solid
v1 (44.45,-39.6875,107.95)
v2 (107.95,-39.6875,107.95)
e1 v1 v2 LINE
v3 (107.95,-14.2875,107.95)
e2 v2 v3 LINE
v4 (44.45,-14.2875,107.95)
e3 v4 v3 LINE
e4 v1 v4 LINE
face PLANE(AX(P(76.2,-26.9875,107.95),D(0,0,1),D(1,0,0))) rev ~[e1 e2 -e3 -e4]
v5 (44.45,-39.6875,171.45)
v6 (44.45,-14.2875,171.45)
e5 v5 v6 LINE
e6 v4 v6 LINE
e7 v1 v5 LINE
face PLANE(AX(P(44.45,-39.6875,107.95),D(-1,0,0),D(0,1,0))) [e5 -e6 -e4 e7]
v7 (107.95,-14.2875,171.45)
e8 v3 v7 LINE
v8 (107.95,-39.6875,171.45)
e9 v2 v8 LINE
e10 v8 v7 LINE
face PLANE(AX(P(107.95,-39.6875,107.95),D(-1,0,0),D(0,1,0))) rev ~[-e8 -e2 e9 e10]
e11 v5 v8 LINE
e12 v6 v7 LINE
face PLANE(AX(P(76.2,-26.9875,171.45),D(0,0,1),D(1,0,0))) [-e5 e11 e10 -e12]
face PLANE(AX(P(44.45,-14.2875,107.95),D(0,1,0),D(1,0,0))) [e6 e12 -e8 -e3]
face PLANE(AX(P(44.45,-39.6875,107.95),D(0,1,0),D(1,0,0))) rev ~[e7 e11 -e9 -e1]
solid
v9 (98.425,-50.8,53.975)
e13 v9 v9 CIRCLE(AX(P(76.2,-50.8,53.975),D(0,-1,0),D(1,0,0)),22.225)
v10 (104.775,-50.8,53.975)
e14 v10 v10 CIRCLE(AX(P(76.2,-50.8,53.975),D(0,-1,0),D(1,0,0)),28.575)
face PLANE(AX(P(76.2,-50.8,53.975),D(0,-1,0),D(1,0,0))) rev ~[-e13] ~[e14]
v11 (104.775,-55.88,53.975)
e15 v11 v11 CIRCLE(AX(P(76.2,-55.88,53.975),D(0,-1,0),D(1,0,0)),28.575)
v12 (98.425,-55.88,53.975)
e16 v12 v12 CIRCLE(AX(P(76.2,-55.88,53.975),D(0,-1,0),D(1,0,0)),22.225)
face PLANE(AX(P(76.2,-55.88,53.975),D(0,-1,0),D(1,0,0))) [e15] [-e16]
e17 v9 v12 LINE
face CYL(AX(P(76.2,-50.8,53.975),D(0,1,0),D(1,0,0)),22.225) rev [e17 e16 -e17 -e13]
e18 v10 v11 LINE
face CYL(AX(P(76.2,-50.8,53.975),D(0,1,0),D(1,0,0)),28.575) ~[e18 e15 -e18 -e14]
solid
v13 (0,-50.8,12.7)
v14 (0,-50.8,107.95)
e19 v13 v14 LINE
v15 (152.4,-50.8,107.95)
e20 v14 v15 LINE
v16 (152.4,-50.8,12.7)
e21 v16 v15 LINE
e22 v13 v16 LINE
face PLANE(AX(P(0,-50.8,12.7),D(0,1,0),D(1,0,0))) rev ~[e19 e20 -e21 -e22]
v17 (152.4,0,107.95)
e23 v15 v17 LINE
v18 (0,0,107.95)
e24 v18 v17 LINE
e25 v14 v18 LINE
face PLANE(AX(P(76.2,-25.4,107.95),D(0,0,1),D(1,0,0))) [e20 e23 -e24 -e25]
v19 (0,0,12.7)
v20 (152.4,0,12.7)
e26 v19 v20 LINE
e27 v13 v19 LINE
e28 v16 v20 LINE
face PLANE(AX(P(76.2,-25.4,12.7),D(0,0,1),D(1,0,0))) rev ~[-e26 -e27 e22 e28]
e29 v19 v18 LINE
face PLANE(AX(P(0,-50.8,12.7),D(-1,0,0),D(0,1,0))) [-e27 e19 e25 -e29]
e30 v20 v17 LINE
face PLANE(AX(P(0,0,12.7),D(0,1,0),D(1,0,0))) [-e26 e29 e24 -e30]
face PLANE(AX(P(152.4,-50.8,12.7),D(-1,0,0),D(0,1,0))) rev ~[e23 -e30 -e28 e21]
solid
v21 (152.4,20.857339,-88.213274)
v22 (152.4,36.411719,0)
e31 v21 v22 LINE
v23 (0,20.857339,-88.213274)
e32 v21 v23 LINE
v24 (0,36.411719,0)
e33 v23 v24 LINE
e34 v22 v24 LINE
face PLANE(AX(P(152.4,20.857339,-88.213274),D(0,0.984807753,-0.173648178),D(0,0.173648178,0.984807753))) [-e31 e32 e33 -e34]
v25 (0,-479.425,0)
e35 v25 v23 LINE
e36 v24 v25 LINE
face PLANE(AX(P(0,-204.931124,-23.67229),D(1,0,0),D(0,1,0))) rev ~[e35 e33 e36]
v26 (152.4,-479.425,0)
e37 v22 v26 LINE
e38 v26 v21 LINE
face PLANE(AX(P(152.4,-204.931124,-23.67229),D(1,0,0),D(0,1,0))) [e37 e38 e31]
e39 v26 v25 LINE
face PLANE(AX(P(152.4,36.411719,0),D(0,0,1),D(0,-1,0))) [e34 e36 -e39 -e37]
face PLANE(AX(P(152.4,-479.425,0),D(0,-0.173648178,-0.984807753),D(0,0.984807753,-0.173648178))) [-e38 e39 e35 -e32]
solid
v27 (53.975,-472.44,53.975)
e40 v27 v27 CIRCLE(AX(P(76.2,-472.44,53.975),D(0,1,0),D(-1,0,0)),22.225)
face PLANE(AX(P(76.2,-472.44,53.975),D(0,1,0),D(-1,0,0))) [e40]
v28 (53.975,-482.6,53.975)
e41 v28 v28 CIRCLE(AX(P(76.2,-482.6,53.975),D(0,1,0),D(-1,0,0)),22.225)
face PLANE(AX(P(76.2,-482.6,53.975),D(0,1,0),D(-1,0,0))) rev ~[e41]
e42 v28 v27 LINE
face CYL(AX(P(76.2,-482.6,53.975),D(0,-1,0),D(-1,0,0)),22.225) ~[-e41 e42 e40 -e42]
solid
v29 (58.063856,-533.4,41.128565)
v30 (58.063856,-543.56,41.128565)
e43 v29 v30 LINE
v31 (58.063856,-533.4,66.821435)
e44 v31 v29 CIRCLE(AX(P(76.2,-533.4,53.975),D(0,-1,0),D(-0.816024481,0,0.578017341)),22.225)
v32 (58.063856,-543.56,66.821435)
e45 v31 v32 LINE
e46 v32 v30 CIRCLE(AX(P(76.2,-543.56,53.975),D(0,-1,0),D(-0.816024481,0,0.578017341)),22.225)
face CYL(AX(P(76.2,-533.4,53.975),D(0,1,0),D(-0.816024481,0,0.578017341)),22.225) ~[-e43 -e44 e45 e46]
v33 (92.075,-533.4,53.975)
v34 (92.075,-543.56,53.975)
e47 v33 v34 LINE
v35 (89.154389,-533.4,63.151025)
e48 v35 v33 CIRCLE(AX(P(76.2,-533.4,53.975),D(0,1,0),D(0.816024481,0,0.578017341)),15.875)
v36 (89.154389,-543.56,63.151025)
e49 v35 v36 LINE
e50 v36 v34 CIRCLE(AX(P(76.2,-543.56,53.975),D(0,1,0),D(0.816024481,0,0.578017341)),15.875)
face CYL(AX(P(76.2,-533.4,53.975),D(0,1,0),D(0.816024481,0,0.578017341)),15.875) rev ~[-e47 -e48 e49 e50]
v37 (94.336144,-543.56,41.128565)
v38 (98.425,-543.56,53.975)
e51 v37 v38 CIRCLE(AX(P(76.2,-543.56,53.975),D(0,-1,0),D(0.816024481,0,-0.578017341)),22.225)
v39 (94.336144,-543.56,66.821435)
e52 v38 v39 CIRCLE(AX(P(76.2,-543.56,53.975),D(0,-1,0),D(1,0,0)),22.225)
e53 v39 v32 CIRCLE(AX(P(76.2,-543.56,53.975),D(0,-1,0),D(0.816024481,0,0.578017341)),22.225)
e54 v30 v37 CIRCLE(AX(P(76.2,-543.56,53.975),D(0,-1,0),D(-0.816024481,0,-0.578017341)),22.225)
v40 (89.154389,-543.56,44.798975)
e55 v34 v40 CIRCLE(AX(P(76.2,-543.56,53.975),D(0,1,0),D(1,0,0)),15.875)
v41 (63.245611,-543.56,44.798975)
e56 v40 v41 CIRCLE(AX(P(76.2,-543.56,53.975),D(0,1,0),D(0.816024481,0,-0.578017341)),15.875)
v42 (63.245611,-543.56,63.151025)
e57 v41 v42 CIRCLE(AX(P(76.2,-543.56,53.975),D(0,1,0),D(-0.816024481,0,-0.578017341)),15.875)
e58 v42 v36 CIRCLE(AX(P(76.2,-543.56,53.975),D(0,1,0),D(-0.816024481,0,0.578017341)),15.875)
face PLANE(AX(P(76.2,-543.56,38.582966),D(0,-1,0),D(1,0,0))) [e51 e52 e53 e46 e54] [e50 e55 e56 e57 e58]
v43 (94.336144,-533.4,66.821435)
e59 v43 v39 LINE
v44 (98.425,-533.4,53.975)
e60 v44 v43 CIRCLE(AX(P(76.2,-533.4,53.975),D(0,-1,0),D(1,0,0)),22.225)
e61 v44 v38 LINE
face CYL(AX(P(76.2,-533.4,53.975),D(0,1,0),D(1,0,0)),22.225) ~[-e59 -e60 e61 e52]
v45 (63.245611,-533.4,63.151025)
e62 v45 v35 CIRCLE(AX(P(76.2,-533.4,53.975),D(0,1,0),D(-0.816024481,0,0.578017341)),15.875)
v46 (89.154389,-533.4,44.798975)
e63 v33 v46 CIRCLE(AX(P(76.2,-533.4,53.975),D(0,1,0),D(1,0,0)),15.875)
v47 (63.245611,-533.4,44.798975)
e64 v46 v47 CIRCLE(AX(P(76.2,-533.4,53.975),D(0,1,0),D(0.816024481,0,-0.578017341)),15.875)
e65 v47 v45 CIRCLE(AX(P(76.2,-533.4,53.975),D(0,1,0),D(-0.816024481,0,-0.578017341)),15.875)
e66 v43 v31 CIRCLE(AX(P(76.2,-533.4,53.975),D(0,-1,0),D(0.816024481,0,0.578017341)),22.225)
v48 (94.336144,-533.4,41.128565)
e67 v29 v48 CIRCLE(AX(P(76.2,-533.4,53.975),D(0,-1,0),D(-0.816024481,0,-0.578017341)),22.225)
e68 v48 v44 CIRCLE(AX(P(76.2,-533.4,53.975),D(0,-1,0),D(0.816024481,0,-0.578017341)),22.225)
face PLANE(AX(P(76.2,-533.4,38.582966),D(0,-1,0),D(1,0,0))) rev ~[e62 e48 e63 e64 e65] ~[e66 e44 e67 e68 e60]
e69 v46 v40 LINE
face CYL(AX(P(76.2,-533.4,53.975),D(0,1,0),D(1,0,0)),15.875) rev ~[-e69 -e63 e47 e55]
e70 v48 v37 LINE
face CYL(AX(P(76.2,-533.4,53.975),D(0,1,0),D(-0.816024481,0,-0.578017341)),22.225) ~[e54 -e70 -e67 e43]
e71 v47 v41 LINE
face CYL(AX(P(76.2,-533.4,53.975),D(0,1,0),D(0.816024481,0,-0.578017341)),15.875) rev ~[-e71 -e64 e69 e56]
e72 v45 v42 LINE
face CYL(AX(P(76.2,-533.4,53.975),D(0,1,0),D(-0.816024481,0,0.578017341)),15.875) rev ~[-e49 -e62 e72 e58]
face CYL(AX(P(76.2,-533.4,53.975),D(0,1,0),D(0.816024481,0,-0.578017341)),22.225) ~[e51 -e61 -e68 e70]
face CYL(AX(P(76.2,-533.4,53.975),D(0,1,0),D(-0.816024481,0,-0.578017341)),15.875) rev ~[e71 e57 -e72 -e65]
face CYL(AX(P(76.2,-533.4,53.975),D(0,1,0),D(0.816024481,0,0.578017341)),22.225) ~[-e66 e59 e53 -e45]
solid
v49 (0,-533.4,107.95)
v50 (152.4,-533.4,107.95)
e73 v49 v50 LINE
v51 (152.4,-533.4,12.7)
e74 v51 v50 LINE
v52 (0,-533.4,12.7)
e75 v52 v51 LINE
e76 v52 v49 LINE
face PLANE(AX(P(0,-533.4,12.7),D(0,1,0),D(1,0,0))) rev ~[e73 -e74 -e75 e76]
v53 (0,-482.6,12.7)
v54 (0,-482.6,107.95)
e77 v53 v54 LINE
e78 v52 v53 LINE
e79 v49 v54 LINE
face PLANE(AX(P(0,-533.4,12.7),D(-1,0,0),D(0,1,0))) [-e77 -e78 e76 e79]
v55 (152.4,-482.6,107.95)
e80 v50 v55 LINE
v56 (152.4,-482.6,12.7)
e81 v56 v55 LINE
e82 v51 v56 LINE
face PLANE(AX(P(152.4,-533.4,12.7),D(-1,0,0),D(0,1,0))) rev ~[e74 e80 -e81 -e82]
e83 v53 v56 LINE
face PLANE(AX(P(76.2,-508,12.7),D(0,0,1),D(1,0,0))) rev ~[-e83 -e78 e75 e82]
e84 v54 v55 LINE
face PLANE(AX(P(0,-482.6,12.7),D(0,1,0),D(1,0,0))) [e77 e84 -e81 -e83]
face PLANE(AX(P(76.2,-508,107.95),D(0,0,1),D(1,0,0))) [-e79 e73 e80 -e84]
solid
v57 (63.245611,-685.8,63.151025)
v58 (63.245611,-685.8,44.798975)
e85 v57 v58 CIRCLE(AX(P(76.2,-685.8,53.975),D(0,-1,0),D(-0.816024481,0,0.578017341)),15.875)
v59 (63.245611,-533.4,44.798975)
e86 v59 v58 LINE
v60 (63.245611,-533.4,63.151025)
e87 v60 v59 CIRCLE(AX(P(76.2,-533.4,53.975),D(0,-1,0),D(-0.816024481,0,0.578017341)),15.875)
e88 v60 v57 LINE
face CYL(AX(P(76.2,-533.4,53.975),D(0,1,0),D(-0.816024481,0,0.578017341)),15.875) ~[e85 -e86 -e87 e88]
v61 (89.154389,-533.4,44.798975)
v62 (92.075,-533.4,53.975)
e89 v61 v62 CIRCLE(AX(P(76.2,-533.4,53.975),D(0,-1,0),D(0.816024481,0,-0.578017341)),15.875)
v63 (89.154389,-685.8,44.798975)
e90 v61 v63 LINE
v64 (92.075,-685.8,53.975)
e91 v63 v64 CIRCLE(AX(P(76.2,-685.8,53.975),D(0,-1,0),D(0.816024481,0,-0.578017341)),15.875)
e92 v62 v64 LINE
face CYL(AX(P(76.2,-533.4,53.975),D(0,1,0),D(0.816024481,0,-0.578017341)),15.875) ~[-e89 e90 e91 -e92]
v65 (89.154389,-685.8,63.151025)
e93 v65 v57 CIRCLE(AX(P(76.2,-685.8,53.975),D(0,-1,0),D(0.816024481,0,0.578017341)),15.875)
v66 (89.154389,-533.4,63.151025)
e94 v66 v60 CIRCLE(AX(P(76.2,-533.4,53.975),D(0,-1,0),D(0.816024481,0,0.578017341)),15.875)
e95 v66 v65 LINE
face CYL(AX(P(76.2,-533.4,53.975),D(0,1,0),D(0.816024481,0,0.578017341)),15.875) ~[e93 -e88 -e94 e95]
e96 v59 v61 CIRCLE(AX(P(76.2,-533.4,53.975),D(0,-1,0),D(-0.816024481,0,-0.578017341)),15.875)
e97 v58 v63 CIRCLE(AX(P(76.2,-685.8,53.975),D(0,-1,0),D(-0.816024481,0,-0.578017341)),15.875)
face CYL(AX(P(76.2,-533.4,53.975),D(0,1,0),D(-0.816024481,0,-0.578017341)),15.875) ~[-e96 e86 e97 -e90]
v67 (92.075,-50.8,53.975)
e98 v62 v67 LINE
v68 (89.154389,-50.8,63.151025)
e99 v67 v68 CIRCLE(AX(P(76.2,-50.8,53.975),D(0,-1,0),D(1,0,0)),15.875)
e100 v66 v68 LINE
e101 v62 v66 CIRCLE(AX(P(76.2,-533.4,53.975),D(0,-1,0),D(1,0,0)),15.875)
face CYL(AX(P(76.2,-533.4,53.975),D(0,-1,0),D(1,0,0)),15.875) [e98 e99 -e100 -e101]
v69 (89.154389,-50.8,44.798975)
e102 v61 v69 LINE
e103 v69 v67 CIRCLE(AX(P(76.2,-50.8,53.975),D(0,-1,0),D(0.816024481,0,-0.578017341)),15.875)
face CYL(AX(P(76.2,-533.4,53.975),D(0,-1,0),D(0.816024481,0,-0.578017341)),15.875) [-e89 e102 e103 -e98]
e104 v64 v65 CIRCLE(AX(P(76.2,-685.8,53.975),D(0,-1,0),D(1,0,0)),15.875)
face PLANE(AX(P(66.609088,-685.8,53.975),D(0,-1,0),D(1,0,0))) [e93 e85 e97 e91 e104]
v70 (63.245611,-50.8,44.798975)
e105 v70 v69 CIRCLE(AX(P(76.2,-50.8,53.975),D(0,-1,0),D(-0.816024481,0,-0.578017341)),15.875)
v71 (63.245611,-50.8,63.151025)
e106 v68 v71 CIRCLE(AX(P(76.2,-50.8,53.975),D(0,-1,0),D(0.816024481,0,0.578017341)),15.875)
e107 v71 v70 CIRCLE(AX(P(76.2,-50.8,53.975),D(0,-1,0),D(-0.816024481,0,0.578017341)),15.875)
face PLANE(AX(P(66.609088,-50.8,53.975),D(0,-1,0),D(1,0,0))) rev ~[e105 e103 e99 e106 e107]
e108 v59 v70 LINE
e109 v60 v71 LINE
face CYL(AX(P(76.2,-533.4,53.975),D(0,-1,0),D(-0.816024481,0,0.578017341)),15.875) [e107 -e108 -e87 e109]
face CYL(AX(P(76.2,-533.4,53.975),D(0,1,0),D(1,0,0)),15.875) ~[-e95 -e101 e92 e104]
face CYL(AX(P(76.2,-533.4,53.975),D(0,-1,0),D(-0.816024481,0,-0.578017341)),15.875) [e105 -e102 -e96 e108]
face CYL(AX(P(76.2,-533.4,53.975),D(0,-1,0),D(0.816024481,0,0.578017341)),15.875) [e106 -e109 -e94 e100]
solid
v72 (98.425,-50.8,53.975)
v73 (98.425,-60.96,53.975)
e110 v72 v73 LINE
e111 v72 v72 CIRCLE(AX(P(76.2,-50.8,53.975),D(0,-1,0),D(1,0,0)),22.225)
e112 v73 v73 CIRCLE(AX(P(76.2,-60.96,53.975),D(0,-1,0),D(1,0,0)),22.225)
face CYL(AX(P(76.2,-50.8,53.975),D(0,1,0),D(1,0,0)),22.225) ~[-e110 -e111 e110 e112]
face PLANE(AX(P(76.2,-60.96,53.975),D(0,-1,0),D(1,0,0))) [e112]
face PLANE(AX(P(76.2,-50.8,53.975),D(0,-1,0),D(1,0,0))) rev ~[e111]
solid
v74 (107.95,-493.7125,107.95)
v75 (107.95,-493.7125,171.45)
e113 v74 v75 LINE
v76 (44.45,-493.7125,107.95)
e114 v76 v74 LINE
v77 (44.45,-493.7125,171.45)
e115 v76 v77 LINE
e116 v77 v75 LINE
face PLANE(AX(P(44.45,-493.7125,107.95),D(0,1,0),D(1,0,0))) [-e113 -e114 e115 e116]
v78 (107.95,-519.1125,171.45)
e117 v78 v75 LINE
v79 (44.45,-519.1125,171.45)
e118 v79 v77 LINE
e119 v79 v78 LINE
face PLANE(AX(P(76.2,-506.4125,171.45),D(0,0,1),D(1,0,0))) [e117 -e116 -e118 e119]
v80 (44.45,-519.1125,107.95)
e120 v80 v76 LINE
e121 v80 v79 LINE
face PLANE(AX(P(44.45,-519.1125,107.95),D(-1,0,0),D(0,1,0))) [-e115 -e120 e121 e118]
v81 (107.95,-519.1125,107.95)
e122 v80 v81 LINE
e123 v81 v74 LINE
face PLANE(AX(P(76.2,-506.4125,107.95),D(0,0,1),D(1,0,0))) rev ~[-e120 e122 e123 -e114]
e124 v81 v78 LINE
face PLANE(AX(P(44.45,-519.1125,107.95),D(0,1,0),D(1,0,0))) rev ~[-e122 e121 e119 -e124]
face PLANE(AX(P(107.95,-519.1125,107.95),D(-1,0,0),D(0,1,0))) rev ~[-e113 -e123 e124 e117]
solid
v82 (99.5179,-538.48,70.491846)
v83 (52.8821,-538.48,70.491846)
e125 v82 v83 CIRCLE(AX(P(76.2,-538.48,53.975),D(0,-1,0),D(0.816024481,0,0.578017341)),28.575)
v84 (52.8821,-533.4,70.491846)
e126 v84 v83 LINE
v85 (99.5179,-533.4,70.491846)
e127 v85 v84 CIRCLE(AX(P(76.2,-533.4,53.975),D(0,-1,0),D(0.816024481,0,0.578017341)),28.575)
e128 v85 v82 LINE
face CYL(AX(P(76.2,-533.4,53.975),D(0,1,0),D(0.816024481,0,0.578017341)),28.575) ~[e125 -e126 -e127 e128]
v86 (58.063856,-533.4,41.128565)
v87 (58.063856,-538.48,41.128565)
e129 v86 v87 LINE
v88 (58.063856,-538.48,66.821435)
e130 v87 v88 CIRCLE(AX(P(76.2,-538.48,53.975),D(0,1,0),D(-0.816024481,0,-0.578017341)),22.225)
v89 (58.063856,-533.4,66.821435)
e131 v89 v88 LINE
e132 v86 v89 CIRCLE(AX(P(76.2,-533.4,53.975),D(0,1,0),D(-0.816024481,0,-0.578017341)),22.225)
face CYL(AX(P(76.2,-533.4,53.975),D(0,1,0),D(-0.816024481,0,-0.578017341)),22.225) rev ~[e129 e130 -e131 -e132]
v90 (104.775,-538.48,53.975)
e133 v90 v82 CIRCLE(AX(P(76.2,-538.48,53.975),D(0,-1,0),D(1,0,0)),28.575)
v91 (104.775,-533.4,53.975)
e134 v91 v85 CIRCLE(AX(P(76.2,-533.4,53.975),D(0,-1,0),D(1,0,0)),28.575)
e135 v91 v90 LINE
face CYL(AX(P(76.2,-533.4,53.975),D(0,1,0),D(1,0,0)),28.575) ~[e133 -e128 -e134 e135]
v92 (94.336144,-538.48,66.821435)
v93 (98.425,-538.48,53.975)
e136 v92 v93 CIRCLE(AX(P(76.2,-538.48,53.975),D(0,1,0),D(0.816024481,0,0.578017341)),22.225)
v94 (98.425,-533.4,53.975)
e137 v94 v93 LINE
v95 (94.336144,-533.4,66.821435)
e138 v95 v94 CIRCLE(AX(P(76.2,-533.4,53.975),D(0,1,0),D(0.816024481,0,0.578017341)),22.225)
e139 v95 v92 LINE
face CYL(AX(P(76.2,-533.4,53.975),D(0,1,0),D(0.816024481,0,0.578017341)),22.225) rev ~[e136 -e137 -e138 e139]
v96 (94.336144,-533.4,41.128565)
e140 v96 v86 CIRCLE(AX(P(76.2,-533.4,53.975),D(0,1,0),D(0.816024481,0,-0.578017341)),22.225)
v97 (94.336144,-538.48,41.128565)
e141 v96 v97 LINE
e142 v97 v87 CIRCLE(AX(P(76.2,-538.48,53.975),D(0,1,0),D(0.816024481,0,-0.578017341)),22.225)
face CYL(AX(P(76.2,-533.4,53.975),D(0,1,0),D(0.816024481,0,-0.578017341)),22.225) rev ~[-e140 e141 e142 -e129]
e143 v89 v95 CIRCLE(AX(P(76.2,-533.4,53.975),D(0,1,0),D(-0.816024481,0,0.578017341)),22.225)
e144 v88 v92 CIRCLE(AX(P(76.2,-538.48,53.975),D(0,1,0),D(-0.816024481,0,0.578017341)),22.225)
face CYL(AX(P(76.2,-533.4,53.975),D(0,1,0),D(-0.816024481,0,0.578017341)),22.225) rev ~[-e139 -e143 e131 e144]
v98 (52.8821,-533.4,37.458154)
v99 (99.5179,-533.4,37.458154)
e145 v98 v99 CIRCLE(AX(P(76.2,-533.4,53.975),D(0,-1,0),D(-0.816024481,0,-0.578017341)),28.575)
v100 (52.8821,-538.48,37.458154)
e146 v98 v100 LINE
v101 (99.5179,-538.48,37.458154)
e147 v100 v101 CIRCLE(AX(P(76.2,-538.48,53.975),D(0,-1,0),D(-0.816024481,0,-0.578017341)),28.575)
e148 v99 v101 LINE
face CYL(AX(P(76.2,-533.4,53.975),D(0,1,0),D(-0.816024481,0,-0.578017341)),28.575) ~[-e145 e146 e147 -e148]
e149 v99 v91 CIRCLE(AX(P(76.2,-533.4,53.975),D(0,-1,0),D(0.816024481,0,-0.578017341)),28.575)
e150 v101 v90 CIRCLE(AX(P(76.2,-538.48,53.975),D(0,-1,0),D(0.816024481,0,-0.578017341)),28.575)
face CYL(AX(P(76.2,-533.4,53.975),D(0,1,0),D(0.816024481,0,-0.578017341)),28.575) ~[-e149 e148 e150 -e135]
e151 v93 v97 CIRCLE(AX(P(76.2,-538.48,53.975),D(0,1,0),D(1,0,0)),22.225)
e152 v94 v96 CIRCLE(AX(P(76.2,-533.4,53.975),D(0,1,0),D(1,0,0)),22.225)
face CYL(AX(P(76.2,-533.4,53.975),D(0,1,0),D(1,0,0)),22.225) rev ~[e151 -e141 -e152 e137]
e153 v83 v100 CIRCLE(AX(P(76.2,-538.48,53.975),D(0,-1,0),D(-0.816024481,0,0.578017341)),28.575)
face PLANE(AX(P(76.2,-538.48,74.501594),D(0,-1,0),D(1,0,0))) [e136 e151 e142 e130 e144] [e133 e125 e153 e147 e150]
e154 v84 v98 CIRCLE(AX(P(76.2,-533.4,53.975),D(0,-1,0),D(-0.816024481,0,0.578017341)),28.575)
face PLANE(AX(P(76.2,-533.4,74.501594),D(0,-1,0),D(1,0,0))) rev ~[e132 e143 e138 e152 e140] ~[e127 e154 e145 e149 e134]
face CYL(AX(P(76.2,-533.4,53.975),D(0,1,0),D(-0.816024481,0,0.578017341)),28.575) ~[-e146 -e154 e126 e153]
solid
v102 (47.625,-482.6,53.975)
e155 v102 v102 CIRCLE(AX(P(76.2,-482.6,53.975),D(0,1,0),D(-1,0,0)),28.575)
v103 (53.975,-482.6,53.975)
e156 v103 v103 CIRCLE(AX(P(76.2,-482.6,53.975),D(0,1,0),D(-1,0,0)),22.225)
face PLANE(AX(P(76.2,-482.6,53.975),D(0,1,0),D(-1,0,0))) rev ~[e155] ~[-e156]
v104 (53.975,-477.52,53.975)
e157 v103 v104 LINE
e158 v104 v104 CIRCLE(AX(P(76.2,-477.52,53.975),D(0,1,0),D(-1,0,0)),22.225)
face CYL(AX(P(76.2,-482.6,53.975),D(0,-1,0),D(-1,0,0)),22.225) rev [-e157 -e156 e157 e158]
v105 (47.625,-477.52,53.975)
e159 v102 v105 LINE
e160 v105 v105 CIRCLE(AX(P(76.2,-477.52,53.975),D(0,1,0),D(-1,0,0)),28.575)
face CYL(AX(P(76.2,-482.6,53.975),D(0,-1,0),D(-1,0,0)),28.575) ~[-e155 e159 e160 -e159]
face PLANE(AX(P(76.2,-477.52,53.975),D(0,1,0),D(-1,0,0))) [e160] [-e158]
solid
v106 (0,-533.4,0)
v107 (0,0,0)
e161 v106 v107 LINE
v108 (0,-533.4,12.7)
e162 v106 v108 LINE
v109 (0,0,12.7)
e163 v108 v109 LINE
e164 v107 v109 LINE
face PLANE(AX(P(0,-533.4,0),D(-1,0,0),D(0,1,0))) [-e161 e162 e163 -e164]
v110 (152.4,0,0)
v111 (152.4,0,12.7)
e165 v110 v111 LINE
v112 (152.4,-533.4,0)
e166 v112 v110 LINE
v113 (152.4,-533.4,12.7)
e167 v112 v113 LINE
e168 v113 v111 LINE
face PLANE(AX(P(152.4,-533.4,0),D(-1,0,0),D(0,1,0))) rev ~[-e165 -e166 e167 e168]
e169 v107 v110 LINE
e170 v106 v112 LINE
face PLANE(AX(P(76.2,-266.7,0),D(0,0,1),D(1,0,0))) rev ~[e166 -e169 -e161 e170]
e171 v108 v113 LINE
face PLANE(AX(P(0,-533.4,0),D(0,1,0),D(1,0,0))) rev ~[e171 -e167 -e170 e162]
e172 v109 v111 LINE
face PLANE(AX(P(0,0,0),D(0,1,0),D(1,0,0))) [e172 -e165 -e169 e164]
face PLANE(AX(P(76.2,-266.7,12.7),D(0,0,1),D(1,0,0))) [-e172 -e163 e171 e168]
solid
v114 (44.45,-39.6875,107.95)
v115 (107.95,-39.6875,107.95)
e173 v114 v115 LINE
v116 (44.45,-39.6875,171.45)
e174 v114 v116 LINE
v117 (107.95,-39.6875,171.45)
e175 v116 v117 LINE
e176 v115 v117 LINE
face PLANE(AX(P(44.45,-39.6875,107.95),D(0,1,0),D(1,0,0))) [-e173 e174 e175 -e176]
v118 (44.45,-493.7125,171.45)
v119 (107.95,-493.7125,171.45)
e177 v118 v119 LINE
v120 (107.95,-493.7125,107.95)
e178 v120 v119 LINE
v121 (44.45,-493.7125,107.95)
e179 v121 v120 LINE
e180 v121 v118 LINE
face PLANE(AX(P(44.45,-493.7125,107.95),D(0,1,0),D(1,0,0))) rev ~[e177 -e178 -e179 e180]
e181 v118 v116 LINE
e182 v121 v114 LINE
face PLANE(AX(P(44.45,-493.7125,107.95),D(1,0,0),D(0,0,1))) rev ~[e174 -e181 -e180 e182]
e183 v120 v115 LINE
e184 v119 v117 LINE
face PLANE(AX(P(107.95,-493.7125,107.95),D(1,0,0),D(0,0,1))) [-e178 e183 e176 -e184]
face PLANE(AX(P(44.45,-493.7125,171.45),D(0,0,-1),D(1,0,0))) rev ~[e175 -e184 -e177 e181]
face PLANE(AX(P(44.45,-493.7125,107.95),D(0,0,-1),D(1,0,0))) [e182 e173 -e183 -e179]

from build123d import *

# Parameters (mm, degrees)
F0_W          = 152.4
F0_H          = 533.4
F1_DEPTH      = 12.7
F2_W          = 152.4
F2_H          = 50.8
F3_DEPTH      = 95.25
F4_W          = 63.5
F4_H          = 25.4
F5_DEPTH      = 63.5
F7_DEPTH      = 482.6
F7_DEPTH_BACK = 152.4
F8_R          = 22.225
F9_DEPTH      = 10.16
F8_R_2        = 28.575
F10_DEPTH     = 5.08
F11_DEPTH     = 10.16
F12_DEPTH     = 5.08
F13_R         = 22.225
F14_DEPTH     = 10.16
F13_R_2       = 28.575
F15_DEPTH     = 5.08
F16_DEPTH     = 454.025
F18_DEPTH     = 152.4


with BuildPart() as f1:
    # F0 (on Top) → F1 (new body)
    with BuildSketch(Plane.XY):
        with Locations((76.2, -266.7)):
            Rectangle(F0_W, F0_H)
    extrude(amount=F1_DEPTH)


with BuildPart() as f3:
    # F2 (on face) → F3 (new body)
    with BuildSketch(Plane.XY.offset(12.7)):
        with Locations((76.2, -25.4)):
            Rectangle(F2_W, F2_H)
    extrude(amount=F3_DEPTH)


with BuildPart() as f3b:
    # F2 (on face) → F3, piece 2 (new body)
    with BuildSketch(Plane.XY.offset(12.7)):
        with Locations((76.2, -508)):
            Rectangle(F2_W, F2_H)
    extrude(amount=F3_DEPTH)


with BuildPart() as f5:
    # F4 (on face) → F5 (new body)
    with BuildSketch(Plane.XY.offset(107.95)):
        with Locations((76.2, -506.4125)):
            Rectangle(F4_W, F4_H)
    extrude(amount=F5_DEPTH)


with BuildPart() as f5b:
    # F4 (on face) → F5, piece 2 (new body)
    with BuildSketch(Plane.XY.offset(107.95)):
        with Locations((76.2, -26.9875)):
            Rectangle(F4_W, F4_H)
    extrude(amount=F5_DEPTH)


with BuildPart() as f7:
    # F6 (on face) → F7 (new body, two sides)
    with BuildSketch(Plane.XZ.offset(533.4)) as f7_sk:
        with BuildLine():
            ThreePointArc((63.2456113625, 63.1510252849), (60.325, 53.975), (63.2456113625, 44.7989747151))
            Line((63.2456113625, 44.7989747151), (76.2, 53.975))
            Line((76.2, 53.975), (63.2456113625, 63.1510252849))
        make_face()
        with BuildLine():
            Line((76.2, 53.975), (63.2456113625, 44.7989747151))
            ThreePointArc((63.2456113625, 44.7989747151), (76.2, 38.1), (89.1543886375, 44.7989747151))
            Line((89.1543886375, 44.7989747151), (76.2, 53.975))
        make_face()
        with BuildLine():
            Line((63.2456113625, 63.1510252849), (76.2, 53.975))
            Line((76.2, 53.975), (89.1543886375, 63.1510252849))
            ThreePointArc((89.1543886375, 63.1510252849), (76.2, 69.85), (63.2456113625, 63.1510252849))
        make_face()
        with BuildLine():
            Line((89.1543886375, 63.1510252849), (76.2, 53.975))
            Line((76.2, 53.975), (89.1543886375, 44.7989747151))
            ThreePointArc((89.1543886375, 44.7989747151), (91.3272361094, 49.1601944286), (92.075, 53.975))
            ThreePointArc((92.075, 53.975), (91.3272361094, 58.7898055714), (89.1543886375, 63.1510252849))
        make_face()
    extrude(amount=-F7_DEPTH)
    extrude(f7_sk.sketch, amount=F7_DEPTH_BACK)


with BuildPart() as f9:
    # F8 (on face) → F9 (new body)
    with BuildSketch(Plane.XZ.offset(50.8)):
        with Locations((76.2, 53.975)):
            Circle(F8_R)
    extrude(amount=F9_DEPTH)


with BuildPart() as f10:
    # F8 (on face) → F10 (new body)
    with BuildSketch(Plane.XZ.offset(50.8)):
        with Locations((76.2, 53.975)):
            Circle(F8_R_2)
        with Locations((76.2, 53.975)):
            Circle(F8_R, mode=Mode.SUBTRACT)
    extrude(amount=F10_DEPTH)


with BuildPart() as f11:
    # F6 (on face) → F11 (new body)
    with BuildSketch(Plane.XZ.offset(533.4)):
        with BuildLine():
            Line((63.2456113625, 44.7989747151), (58.0638559075, 41.1285646012))
            ThreePointArc((58.0638559075, 41.1285646012), (76.2, 31.75), (94.3361440925, 41.1285646012))
            Line((94.3361440925, 41.1285646012), (89.1543886375, 44.7989747151))
            ThreePointArc((89.1543886375, 44.7989747151), (76.2, 38.1), (63.2456113625, 44.7989747151))
        make_face()
        with BuildLine():
            ThreePointArc((58.0638559075, 66.8214353988), (53.975, 53.975), (58.0638559075, 41.1285646012))
            Line((58.0638559075, 41.1285646012), (63.2456113625, 44.7989747151))
            ThreePointArc((63.2456113625, 44.7989747151), (60.325, 53.975), (63.2456113625, 63.1510252849))
            Line((63.2456113625, 63.1510252849), (58.0638559075, 66.8214353988))
        make_face()
        with BuildLine():
            ThreePointArc((94.3361440925, 66.8214353988), (76.2, 76.2), (58.0638559075, 66.8214353988))
            Line((58.0638559075, 66.8214353988), (63.2456113625, 63.1510252849))
            ThreePointArc((63.2456113625, 63.1510252849), (76.2, 69.85), (89.1543886375, 63.1510252849))
            Line((89.1543886375, 63.1510252849), (94.3361440925, 66.8214353988))
        make_face()
        with BuildLine():
            Line((89.1543886375, 44.7989747151), (94.3361440925, 41.1285646012))
            ThreePointArc((94.3361440925, 41.1285646012), (97.3781305532, 47.2342722001), (98.425, 53.975))
            ThreePointArc((98.425, 53.975), (97.3781305532, 60.7157277999), (94.3361440925, 66.8214353988))
            Line((94.3361440925, 66.8214353988), (89.1543886375, 63.1510252849))
            ThreePointArc((89.1543886375, 63.1510252849), (91.3272361094, 58.7898055714), (92.075, 53.975))
            ThreePointArc((92.075, 53.975), (91.3272361094, 49.1601944286), (89.1543886375, 44.7989747151))
        make_face()
    extrude(amount=F11_DEPTH)


with BuildPart() as f12:
    # F6 (on face) → F12 (new body)
    with BuildSketch(Plane.XZ.offset(533.4)):
        with BuildLine():
            ThreePointArc((99.5178995475, 70.4918455128), (76.2, 82.55), (52.8821004525, 70.4918455128))
            Line((52.8821004525, 70.4918455128), (58.0638559075, 66.8214353988))
            ThreePointArc((58.0638559075, 66.8214353988), (76.2, 76.2), (94.3361440925, 66.8214353988))
            Line((94.3361440925, 66.8214353988), (99.5178995475, 70.4918455128))
        make_face()
        with BuildLine():
            ThreePointArc((52.8821004525, 70.4918455128), (47.625, 53.975), (52.8821004525, 37.4581544872))
            Line((52.8821004525, 37.4581544872), (58.0638559075, 41.1285646012))
            ThreePointArc((58.0638559075, 41.1285646012), (53.975, 53.975), (58.0638559075, 66.8214353988))
            Line((58.0638559075, 66.8214353988), (52.8821004525, 70.4918455128))
        make_face()
        with BuildLine():
            Line((58.0638559075, 41.1285646012), (52.8821004525, 37.4581544872))
            ThreePointArc((52.8821004525, 37.4581544872), (76.2, 25.4), (99.5178995475, 37.4581544872))
            Line((99.5178995475, 37.4581544872), (94.3361440925, 41.1285646012))
            ThreePointArc((94.3361440925, 41.1285646012), (76.2, 31.75), (58.0638559075, 41.1285646012))
        make_face()
        with BuildLine():
            Line((94.3361440925, 41.1285646012), (99.5178995475, 37.4581544872))
            ThreePointArc((99.5178995475, 37.4581544872), (103.429024997, 45.3083499716), (104.775, 53.975))
            ThreePointArc((104.775, 53.975), (103.429024997, 62.6416500284), (99.5178995475, 70.4918455128))
            Line((99.5178995475, 70.4918455128), (94.3361440925, 66.8214353988))
            ThreePointArc((94.3361440925, 66.8214353988), (97.3781305532, 60.7157277999), (98.425, 53.975))
            ThreePointArc((98.425, 53.975), (97.3781305532, 47.2342722001), (94.3361440925, 41.1285646012))
        make_face()
    extrude(amount=F12_DEPTH)


with BuildPart() as f14:
    # F13 (on face) → F14 (new body)
    with BuildSketch(Plane(origin=(0, -482.6, 0), x_dir=(-1, 0, 0), z_dir=(0, 1, 0))):
        with Locations((-76.2, 53.975)):
            Circle(F13_R)
    extrude(amount=F14_DEPTH)


with BuildPart() as f15:
    # F13 (on face) → F15 (new body)
    with BuildSketch(Plane(origin=(0, -482.6, 0), x_dir=(-1, 0, 0), z_dir=(0, 1, 0))):
        with Locations((-76.2, 53.975)):
            Circle(F13_R_2)
        with Locations((-76.2, 53.975)):
            Circle(F13_R, mode=Mode.SUBTRACT)
    extrude(amount=F15_DEPTH)


with BuildPart() as f16:
    # F16 (new, through all): a face of the model
    f16_faces = [f5.part.faces().sort_by_distance(p)[0] for p in [
        (76.2, -493.7125, 139.7),
    ]]
    extrude(f16_faces, amount=F16_DEPTH)


with BuildPart() as f18:
    # F17 (on face) → F18 (new body)
    with BuildSketch(Plane.YZ.offset(152.4)):
        Polygon((0, 0), (-479.425, 0), (20.8573385302, -88.2132742548), (36.411718838, 0), align=None)
    extrude(amount=-F18_DEPTH)


solid = Compound([f1.part, f3.part, f3b.part, f5.part, f5b.part, f7.part, f9.part, f10.part, f11.part, f12.part, f14.part, f15.part, f16.part, f18.part])
